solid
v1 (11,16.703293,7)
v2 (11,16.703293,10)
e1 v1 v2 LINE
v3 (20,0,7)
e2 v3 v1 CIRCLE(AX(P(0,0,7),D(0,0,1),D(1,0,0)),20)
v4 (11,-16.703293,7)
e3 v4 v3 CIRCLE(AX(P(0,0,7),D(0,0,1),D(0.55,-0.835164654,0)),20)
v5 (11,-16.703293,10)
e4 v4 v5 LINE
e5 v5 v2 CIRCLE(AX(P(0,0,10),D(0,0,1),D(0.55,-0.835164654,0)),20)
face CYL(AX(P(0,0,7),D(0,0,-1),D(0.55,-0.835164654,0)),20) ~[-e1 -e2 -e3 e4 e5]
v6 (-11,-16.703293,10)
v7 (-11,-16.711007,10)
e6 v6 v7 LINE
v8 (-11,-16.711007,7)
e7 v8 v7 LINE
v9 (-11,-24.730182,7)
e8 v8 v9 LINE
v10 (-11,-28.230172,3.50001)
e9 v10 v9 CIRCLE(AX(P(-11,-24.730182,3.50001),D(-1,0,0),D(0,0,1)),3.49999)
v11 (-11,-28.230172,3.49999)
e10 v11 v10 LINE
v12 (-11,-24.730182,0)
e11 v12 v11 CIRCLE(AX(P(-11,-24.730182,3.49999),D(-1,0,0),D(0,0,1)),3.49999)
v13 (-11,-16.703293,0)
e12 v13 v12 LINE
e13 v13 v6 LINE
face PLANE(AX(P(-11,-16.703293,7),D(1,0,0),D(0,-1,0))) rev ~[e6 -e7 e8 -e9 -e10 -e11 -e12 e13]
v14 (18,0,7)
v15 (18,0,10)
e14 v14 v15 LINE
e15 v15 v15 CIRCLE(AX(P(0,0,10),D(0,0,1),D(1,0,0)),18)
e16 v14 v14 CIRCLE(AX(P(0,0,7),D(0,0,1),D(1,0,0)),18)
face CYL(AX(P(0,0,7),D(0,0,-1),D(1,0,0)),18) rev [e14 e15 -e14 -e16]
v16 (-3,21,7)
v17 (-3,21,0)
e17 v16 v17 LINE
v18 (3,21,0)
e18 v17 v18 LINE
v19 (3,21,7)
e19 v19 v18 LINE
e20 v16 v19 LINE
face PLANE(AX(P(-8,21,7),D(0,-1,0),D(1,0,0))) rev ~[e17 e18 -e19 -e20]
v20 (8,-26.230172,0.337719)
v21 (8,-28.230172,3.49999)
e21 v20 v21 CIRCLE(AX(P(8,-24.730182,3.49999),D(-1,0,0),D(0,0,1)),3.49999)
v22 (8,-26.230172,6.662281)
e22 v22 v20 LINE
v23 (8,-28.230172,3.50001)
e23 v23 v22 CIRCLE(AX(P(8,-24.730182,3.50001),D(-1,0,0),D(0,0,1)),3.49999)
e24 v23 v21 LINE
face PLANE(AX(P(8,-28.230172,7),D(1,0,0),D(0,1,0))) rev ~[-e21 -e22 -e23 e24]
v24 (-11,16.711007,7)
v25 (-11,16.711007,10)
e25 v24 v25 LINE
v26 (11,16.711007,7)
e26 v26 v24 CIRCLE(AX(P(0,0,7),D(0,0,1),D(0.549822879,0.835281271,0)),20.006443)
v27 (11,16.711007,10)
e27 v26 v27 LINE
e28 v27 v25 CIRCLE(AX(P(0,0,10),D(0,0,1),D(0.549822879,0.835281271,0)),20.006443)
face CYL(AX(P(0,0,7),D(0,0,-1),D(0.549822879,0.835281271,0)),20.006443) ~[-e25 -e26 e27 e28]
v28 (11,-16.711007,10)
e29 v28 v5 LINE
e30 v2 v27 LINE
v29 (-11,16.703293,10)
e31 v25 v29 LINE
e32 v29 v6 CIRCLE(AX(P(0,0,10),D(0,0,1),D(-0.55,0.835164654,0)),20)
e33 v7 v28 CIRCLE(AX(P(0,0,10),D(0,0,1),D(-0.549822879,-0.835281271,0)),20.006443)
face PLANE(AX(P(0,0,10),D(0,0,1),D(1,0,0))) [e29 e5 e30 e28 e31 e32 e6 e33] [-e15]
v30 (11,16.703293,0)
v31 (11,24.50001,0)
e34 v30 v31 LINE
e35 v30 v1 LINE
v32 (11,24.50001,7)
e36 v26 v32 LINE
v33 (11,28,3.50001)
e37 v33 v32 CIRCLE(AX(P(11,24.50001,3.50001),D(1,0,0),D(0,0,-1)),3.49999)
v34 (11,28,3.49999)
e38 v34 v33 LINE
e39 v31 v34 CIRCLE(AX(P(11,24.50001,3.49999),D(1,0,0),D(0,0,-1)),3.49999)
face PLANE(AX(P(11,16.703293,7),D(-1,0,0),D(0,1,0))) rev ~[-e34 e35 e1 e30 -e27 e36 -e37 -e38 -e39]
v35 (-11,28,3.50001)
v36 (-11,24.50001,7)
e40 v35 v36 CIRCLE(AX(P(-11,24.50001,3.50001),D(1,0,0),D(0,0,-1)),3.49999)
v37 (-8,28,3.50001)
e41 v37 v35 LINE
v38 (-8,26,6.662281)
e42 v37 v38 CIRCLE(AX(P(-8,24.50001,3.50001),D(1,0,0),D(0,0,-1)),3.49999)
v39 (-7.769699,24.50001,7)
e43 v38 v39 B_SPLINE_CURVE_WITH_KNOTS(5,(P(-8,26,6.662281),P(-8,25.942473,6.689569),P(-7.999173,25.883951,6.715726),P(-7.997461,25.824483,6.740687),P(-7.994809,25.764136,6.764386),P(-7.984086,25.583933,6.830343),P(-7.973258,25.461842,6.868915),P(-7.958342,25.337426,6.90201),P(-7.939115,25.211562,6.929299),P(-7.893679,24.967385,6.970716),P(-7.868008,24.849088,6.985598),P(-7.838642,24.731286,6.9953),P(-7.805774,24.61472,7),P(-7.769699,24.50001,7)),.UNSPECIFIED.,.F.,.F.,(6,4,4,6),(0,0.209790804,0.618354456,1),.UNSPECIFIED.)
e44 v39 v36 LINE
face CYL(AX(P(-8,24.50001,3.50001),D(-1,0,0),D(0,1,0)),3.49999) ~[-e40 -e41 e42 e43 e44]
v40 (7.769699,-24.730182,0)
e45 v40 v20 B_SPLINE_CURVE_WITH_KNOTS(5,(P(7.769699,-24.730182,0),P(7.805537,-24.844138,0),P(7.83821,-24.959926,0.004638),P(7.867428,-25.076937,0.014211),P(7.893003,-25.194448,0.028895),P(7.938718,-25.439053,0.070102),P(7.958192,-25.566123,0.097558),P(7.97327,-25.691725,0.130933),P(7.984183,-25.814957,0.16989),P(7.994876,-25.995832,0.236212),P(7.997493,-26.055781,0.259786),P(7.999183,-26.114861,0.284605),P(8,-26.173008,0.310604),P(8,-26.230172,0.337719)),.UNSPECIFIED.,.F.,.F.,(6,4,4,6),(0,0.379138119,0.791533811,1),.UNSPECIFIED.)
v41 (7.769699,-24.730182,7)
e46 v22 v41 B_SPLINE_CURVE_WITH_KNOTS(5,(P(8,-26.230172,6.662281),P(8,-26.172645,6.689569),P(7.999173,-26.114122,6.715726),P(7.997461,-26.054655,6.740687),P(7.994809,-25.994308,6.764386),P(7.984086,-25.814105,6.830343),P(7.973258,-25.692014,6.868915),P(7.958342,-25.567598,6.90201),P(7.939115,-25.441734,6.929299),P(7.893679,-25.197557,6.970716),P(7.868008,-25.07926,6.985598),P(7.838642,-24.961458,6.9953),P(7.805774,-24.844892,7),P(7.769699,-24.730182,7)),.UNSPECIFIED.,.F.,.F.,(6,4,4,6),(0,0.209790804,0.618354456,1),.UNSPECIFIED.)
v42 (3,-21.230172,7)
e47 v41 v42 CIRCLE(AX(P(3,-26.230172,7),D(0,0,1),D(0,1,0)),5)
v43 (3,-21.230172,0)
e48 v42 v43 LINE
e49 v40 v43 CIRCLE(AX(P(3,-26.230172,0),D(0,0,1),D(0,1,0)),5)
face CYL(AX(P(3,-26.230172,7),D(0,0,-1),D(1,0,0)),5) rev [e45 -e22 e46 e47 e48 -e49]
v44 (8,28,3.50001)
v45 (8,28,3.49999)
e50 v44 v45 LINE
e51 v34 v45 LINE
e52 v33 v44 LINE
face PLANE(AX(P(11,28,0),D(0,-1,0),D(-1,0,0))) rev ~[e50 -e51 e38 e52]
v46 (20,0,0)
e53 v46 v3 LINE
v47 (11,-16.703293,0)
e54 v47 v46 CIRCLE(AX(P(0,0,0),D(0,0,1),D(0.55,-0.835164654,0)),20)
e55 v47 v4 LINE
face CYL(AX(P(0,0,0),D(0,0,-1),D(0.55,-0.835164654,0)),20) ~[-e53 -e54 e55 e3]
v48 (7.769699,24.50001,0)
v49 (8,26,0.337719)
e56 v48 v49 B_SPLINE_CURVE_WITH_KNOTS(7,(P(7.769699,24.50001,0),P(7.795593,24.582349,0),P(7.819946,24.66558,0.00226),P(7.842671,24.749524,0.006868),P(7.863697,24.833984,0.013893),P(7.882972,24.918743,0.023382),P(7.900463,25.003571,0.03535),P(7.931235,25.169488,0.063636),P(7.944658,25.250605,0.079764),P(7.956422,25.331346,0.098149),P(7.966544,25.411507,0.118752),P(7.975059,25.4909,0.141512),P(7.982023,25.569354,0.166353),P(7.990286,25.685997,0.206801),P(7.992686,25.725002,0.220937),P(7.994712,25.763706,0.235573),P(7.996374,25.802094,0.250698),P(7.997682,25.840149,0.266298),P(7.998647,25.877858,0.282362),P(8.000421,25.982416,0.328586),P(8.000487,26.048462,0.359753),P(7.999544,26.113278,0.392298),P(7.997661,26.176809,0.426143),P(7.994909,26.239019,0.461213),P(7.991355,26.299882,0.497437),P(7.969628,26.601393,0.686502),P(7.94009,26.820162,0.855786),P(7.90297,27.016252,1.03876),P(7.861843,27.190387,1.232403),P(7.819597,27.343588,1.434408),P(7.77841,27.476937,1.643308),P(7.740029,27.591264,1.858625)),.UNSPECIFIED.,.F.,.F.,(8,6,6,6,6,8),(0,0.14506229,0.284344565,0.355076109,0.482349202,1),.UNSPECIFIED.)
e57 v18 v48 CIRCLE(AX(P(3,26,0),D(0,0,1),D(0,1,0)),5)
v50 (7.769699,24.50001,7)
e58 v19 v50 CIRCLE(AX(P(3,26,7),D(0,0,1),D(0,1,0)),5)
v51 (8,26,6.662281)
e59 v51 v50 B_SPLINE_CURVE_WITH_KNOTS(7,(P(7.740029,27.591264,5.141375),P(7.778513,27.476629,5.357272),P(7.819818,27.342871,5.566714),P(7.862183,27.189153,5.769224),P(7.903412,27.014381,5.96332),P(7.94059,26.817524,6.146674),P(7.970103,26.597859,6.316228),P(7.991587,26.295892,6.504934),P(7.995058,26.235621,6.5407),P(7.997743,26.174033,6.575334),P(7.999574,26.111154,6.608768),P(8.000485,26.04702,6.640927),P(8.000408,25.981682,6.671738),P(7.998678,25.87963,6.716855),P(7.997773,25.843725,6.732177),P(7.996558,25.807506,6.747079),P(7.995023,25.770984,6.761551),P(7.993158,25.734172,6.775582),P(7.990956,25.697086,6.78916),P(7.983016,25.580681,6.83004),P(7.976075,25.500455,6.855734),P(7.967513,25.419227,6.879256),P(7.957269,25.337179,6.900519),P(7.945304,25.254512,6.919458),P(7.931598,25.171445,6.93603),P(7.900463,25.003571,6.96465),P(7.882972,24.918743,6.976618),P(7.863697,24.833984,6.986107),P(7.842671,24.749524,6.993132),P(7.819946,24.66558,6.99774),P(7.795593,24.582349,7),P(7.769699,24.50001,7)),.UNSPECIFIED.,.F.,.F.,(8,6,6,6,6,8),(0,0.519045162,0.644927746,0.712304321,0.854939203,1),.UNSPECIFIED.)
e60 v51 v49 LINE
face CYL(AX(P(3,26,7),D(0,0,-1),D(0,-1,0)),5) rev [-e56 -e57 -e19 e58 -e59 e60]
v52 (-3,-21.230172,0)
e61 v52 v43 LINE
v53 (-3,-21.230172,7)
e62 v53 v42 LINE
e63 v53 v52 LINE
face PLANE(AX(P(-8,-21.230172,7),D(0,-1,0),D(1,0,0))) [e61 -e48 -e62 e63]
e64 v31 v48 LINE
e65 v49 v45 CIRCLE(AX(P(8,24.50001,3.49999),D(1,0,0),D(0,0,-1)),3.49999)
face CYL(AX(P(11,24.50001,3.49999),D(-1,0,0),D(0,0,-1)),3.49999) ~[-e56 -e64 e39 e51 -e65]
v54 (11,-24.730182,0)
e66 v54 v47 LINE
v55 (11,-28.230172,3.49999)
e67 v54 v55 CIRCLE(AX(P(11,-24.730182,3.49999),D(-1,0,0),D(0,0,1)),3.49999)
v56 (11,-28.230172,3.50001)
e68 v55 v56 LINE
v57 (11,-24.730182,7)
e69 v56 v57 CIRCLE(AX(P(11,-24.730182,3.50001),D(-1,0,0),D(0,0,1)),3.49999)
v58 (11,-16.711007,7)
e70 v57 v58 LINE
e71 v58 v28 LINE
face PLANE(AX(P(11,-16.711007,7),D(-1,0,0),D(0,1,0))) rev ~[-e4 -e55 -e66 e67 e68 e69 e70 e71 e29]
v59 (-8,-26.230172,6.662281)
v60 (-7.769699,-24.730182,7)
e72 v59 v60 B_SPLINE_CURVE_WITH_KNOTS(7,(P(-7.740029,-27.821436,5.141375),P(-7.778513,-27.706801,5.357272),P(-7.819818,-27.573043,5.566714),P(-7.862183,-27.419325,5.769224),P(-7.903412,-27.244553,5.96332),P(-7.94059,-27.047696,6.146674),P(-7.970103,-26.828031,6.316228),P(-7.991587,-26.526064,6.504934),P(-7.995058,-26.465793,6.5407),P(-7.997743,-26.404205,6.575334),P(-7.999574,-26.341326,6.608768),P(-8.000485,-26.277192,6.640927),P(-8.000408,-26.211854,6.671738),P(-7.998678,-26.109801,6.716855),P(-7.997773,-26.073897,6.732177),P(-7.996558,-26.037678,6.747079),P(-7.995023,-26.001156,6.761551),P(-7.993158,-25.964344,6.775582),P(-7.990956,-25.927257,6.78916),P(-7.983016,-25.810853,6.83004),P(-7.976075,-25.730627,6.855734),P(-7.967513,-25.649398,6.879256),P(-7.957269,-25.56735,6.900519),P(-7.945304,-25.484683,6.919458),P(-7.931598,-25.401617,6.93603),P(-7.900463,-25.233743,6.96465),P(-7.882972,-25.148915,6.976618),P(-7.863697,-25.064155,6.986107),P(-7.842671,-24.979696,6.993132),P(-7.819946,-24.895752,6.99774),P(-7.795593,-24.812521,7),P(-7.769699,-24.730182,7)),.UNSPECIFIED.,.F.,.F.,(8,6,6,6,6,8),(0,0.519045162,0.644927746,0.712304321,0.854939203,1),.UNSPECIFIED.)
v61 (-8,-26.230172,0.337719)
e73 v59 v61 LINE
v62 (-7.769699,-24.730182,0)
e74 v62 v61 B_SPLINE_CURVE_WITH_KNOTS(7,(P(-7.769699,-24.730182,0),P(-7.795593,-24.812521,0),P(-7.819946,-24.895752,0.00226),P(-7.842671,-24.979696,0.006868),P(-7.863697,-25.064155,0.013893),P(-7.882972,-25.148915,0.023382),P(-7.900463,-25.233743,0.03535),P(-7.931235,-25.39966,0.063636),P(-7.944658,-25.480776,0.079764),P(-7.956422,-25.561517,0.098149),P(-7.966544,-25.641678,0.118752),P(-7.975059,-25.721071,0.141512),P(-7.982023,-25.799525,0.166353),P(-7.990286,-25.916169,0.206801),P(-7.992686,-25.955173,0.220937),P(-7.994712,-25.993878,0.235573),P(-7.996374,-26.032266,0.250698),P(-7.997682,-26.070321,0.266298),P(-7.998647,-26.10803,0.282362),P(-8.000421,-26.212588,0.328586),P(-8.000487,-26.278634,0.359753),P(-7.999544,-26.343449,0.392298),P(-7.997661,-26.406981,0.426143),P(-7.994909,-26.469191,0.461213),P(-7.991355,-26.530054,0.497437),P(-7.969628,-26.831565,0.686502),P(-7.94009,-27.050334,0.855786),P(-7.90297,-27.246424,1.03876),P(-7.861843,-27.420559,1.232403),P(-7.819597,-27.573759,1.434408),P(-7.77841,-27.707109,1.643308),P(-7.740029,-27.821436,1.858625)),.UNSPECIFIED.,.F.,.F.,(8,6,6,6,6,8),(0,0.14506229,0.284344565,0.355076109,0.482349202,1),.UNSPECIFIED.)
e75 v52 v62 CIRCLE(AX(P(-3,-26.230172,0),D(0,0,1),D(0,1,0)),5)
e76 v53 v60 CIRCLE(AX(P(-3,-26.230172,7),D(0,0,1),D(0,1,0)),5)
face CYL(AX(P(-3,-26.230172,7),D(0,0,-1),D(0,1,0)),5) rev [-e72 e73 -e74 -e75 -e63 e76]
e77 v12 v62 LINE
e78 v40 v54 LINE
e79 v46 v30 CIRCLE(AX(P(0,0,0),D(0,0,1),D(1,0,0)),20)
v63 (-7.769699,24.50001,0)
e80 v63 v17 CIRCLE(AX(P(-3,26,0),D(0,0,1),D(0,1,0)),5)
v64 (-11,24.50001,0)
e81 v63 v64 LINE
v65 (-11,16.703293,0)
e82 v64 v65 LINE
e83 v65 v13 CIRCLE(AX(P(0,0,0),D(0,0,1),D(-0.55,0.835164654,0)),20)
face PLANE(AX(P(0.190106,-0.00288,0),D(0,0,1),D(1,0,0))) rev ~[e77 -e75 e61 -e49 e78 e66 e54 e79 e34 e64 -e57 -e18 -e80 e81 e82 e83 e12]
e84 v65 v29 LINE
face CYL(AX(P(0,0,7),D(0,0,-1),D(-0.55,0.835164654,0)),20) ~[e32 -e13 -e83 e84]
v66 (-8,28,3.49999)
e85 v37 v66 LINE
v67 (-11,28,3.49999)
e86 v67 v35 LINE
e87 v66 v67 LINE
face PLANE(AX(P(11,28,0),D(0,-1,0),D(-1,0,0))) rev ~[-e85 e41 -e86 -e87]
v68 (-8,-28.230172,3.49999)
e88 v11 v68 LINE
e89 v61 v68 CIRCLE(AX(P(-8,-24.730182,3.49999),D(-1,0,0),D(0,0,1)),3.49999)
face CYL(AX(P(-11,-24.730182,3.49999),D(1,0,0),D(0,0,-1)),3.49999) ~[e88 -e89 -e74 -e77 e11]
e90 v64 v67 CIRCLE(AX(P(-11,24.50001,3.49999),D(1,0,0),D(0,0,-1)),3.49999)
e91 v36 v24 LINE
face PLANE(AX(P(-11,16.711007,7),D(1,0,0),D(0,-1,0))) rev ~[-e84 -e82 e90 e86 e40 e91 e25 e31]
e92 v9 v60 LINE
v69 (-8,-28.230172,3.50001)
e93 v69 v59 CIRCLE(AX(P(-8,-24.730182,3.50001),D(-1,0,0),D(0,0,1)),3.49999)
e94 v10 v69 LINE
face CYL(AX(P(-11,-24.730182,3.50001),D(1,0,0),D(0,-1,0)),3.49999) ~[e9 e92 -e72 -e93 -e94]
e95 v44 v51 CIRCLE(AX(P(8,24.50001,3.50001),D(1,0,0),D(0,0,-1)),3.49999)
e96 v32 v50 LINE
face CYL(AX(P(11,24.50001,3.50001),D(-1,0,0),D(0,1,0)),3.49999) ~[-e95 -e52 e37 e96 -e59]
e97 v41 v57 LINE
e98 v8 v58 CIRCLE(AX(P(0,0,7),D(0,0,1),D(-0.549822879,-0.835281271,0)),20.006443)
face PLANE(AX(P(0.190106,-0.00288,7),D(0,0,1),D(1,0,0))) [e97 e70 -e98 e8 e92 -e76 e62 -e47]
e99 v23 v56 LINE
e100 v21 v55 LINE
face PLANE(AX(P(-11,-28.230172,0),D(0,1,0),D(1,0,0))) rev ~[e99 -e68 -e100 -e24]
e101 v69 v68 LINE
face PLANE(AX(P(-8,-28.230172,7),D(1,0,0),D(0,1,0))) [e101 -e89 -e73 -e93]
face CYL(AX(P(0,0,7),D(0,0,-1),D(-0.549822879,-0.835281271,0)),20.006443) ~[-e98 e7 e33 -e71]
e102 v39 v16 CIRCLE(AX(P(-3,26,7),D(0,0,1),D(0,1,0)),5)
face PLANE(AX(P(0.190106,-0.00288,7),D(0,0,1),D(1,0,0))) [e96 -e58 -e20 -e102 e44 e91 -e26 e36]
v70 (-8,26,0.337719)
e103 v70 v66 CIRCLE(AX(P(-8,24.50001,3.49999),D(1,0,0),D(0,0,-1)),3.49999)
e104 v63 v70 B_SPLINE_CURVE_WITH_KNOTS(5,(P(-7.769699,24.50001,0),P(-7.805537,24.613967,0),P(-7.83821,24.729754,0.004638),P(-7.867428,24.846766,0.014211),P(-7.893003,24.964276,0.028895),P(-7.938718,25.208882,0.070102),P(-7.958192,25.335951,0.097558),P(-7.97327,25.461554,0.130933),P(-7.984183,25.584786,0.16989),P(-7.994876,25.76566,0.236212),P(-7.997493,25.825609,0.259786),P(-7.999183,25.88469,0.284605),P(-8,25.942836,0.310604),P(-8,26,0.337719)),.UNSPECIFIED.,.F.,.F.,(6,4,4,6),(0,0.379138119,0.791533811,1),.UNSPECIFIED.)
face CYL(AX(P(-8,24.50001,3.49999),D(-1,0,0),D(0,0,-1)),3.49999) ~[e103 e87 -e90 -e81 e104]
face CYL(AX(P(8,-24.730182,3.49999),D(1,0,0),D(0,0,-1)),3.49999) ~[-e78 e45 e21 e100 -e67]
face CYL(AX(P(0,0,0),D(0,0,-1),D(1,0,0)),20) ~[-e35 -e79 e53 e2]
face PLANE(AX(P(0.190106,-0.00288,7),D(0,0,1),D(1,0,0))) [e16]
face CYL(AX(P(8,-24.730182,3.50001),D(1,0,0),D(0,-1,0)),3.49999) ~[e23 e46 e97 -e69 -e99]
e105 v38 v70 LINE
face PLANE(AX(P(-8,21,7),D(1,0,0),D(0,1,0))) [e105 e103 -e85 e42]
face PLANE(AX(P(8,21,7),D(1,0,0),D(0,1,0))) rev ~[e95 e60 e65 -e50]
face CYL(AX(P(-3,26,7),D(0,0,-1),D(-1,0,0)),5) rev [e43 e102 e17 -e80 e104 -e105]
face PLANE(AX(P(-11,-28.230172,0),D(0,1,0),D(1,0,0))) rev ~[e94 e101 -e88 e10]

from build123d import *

# Parameters (mm, degrees)
F1_DEPTH = 7
F2_W     = 16
F2_H     = 7
F3_DEPTH = 10
F4_R     = 5
F5_R     = 3.49999
F6_R     = 18
F7_DEPTH = 3


# Not quite as in the source:
# - a fillet or chamfer is up to 0.001 mm smaller than in the source, because OpenCascade refuses the exact size


with BuildPart() as f1:
    # F0 (on Top) → F1 (new body)
    with BuildSketch(Plane.XY):
        with BuildLine():
            ThreePointArc((11, -16.7032930885), (17.6068168617, -9.4868329805), (20, 0))
            ThreePointArc((20, 0), (17.6068168617, 9.4868329805), (11, 16.7032930885))
            Line((11, 16.7032930885), (11, 12))
            Line((11, 12), (-11, 12))
            Line((-11, 12), (-11, 16.7032930885))
            ThreePointArc((-11, 16.7032930885), (-20, 0), (-11, -16.7032930885))
            Line((-11, -16.7032930885), (-11, -11.7698283494))
            Line((-11, -11.7698283494), (11, -11.7698283494))
            Line((11, -11.7698283494), (11, -16.7032930885))
        make_face()
        with BuildLine():
            Line((11, 12), (11, 16.7032930885))
            ThreePointArc((11, 16.7032930885), (0, 20), (-11, 16.7032930885))
            Line((-11, 16.7032930885), (-11, 12))
            Line((-11, 12), (11, 12))
        make_face()
        with BuildLine():
            ThreePointArc((-11, 16.7032930885), (0, 20), (11, 16.7032930885))
            Line((11, 16.7032930885), (11, 28))
            Line((11, 28), (-11, 28))
            Line((-11, 28), (-11, 16.7032930885))
        make_face()
        with BuildLine():
            Line((11, -28.2301716506), (11, -16.7032930885))
            ThreePointArc((11, -16.7032930885), (0, -20), (-11, -16.7032930885))
            Line((-11, -16.7032930885), (-11, -28.2301716506))
            Line((-11, -28.2301716506), (11, -28.2301716506))
        make_face()
        with BuildLine():
            ThreePointArc((-11, -16.7032930885), (0, -20), (11, -16.7032930885))
            Line((11, -16.7032930885), (11, -11.7698283494))
            Line((11, -11.7698283494), (-11, -11.7698283494))
            Line((-11, -11.7698283494), (-11, -16.7032930885))
        make_face()
    extrude(amount=F1_DEPTH)

    # F2 (on face) → F3 (cut)
    with BuildSketch(Plane.XY.offset(7)):
        with Locations((0, 24.5)):
            Rectangle(F2_W, F2_H)
        with Locations((0, -24.7301716506)):
            Rectangle(F2_W, F2_H)
    extrude(amount=-F3_DEPTH, mode=Mode.SUBTRACT)

    # F4
    f4_edges = [f1.edges().sort_by_distance(p)[0] for p in [
        (-8, 21, 3.5),
        (8, 21, 3.5),
        (8, -21.230172, 3.5),
        (-8, -21.230172, 3.5),
    ]]
    fillet(f4_edges, radius=F4_R)

    # F5 (radius 3.5 in the source; OpenCascade refuses exactly that, so slightly less here)
    f5_edges = [f1.edges().sort_by_distance(p)[0] for p in [
        (-9.5, -28.230172, 7),
        (9.5, -28.230172, 7),
        (-9.5, 28, 7),
        (9.5, 28, 7),
        (-9.5, 28, 0),
        (9.5, 28, 0),
        (-9.5, -28.230172, 0),
        (9.5, -28.230172, 0),
    ]]
    fillet(f5_edges, radius=F5_R)

    # F6 (on face) → F7 (join)
    with BuildSketch(Plane.XY.offset(7)):
        with BuildLine():
            Line((11, 16.7032930885), (11, 16.71100699))
            ThreePointArc((11, 16.71100699), (0, 20.0064428277), (-11, 16.71100699))
            Line((-11, 16.71100699), (-11, 16.7032930885))
            ThreePointArc((-11, 16.7032930885), (-20, 0), (-11, -16.7032930885))
            Line((-11, -16.7032930885), (-11, -16.71100699))
            ThreePointArc((-11, -16.71100699), (0, -20.0064428277), (11, -16.71100699))
            Line((11, -16.71100699), (11, -16.7032930885))
            ThreePointArc((11, -16.7032930885), (20, 0), (11, 16.7032930885))
        make_face()
        Circle(F6_R, mode=Mode.SUBTRACT)
    extrude(amount=F7_DEPTH)


solid = f1.part
